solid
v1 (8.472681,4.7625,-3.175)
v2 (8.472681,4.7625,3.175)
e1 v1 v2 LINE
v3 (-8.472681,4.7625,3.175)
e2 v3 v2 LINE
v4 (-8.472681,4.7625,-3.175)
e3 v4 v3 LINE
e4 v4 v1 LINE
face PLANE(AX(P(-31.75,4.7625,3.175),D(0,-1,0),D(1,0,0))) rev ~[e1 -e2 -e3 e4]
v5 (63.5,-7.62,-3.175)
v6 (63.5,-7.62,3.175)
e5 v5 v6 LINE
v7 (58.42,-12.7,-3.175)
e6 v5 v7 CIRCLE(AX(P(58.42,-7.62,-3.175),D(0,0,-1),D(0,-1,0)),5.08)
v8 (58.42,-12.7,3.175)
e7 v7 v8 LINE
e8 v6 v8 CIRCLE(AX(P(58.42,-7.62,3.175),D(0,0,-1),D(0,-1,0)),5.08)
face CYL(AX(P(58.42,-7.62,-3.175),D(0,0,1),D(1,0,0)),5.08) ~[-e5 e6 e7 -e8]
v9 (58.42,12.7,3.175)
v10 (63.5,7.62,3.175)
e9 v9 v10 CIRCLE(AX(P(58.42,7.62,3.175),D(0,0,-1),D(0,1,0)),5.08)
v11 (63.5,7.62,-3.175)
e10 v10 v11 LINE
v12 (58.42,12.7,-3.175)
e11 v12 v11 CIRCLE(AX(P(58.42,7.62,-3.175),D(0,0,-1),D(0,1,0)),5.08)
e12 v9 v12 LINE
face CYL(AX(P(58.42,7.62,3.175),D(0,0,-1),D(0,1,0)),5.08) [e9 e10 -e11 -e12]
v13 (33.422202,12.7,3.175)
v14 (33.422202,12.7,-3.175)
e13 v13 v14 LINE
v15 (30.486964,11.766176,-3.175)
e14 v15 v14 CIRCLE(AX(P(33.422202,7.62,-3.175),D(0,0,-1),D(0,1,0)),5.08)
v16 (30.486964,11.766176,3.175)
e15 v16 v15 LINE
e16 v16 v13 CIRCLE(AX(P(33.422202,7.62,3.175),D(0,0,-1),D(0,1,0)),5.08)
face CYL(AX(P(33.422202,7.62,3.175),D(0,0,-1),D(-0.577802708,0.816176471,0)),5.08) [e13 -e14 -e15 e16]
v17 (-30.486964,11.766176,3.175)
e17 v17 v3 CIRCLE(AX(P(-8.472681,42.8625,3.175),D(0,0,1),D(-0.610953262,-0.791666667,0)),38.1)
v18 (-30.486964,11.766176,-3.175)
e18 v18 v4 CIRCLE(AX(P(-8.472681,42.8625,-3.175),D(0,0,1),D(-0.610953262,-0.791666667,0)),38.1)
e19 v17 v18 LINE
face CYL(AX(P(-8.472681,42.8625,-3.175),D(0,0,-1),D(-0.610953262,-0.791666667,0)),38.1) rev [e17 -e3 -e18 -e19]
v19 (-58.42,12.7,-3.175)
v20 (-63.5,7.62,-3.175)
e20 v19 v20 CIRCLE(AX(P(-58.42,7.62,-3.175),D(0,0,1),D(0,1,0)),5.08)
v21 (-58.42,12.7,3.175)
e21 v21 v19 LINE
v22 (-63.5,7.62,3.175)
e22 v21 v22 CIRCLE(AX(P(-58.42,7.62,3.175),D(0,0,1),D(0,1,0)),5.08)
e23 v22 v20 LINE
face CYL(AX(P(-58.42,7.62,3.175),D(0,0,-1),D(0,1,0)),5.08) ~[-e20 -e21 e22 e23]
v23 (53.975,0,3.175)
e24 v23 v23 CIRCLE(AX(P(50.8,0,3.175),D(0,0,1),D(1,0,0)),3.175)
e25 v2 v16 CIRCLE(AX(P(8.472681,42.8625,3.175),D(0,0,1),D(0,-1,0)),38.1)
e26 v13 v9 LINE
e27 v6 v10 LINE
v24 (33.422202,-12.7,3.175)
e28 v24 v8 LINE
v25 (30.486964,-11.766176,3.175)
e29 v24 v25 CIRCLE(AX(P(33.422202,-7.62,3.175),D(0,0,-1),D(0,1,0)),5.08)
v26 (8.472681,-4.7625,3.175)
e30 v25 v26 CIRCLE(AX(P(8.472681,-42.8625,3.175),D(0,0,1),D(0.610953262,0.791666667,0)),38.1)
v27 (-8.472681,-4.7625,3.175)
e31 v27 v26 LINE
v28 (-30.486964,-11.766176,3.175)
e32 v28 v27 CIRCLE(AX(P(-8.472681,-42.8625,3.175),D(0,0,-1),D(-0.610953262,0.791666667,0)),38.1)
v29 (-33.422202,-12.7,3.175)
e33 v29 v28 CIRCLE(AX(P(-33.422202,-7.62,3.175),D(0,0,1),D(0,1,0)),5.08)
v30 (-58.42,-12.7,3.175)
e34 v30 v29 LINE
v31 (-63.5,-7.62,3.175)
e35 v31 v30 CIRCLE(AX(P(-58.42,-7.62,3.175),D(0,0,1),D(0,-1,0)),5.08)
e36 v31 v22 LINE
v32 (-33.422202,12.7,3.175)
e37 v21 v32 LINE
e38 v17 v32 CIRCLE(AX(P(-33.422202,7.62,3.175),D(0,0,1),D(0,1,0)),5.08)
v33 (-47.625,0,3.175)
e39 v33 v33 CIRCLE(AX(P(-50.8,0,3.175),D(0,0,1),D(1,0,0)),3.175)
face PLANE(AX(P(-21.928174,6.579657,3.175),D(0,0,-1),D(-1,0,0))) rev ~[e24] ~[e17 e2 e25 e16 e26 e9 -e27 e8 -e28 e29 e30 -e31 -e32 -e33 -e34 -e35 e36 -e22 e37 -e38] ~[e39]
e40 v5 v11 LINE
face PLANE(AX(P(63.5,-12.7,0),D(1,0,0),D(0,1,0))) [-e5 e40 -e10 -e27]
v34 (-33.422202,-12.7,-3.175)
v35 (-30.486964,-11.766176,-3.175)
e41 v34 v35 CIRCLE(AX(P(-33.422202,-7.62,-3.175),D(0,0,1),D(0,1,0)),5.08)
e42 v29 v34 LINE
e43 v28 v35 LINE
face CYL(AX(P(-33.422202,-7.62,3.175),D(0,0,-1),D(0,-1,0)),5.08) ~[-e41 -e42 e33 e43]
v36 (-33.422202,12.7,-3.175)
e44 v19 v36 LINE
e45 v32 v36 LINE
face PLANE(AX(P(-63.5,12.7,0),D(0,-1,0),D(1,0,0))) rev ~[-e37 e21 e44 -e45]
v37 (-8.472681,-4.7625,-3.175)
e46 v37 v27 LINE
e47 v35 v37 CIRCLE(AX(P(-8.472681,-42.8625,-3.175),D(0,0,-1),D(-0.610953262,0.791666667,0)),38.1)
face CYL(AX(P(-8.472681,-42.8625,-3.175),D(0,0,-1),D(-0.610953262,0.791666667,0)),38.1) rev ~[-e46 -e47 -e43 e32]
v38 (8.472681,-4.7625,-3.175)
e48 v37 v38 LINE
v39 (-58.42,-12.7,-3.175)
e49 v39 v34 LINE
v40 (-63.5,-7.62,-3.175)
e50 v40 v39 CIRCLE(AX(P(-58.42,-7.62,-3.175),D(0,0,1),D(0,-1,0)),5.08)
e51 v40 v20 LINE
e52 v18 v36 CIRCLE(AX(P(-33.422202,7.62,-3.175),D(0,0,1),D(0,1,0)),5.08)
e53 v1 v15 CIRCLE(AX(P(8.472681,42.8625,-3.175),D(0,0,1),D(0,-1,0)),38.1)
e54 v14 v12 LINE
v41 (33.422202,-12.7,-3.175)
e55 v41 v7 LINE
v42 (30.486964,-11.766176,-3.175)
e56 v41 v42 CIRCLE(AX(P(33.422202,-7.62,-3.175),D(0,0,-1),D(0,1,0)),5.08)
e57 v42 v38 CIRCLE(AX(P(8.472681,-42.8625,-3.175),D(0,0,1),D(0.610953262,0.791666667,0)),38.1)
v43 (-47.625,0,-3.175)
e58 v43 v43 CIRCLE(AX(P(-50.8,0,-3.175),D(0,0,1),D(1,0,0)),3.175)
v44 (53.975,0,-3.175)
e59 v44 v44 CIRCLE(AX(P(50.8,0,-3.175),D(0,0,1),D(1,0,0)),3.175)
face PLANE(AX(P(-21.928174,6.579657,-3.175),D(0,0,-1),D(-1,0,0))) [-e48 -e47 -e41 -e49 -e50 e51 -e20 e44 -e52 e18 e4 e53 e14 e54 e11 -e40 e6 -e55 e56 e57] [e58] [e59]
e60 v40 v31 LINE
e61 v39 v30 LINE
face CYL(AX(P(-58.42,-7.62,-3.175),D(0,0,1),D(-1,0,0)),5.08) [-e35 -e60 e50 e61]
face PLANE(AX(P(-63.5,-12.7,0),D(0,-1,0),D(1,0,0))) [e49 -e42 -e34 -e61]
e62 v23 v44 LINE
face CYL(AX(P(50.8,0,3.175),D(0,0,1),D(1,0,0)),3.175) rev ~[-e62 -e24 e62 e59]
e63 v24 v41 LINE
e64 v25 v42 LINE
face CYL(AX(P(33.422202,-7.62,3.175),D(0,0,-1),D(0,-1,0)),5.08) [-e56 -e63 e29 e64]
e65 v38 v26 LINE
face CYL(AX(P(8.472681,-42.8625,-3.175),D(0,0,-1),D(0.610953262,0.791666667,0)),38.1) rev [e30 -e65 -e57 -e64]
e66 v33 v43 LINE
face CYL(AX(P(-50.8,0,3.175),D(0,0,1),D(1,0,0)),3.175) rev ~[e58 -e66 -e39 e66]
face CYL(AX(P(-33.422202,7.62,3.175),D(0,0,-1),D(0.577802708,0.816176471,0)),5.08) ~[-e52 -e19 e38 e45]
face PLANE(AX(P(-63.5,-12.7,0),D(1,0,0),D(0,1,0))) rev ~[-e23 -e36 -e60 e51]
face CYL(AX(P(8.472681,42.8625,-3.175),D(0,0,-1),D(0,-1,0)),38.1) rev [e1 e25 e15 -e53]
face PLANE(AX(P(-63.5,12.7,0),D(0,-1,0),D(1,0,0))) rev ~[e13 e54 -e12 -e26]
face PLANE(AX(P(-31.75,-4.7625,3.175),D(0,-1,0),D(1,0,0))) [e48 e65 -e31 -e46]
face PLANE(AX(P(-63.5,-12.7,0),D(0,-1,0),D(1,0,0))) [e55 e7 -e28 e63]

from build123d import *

# Parameters (mm, degrees)
F0_W        = 127
F0_H        = 25.4
F1_DEPTH    = 3.175
F2_W        = 63.5
F2_H        = 7.9375
F3_DEPTH    = 25.4
F4_T1_DEPTH = 6.35
F5_R        = 5.08
F6_R        = 3.175
F7_DEPTH    = 25.4


# Not quite as in the source:
# - a fillet or chamfer that OpenCascade refuses, or shapes differently, is made with other operations: its cross-section is extruded or revolved along the edge and cut away or added


with BuildPart() as f1:
    # F0 (on Top) → F1 (new body, symmetric)
    with BuildSketch(Plane.XY):
        Rectangle(F0_W, F0_H)
    extrude(amount=F1_DEPTH, both=True)

    # F2 (on face) → F3 (cut)
    with BuildSketch(Plane.XY.offset(3.175)):
        with Locations((0, 8.73125)):
            Rectangle(F2_W, F2_H)
        with Locations((0, -8.73125)):
            Rectangle(F2_W, F2_H)
    extrude(amount=-F3_DEPTH, mode=Mode.SUBTRACT)

    # F4: fillet of radius 38.1 on 4 edges, made by hand

    # F4_s2 → F4_t1 (join)
    with BuildSketch(Plane.XY.offset(-3.175)):
        with BuildLine():
            ThreePointArc((-31.75, 12.7), (-20.7694028252, 6.8014320042), (-8.4726807009, 4.7625))
            Line((-8.4726807009, 4.7625), (-31.75, 4.7625))
            Line((-31.75, 4.7625), (-31.75, 12.7))
        make_face()
        with BuildLine():
            ThreePointArc((8.4726807009, 4.7625), (20.7694028252, 6.8014320042), (31.75, 12.7))
            Line((31.75, 12.7), (31.75, 4.7625))
            Line((31.75, 4.7625), (8.4726807009, 4.7625))
        make_face()
        with BuildLine():
            ThreePointArc((31.75, -12.7), (20.7694028252, -6.8014320042), (8.4726807009, -4.7625))
            Line((8.4726807009, -4.7625), (31.75, -4.7625))
            Line((31.75, -4.7625), (31.75, -12.7))
        make_face()
        with BuildLine():
            ThreePointArc((-31.75, -12.7), (-20.7694028252, -6.8014320042), (-8.4726807009, -4.7625))
            Line((-8.4726807009, -4.7625), (-31.75, -4.7625))
            Line((-31.75, -4.7625), (-31.75, -12.7))
        make_face()
    extrude(amount=F4_T1_DEPTH)

    # F5
    f5_edges = [f1.edges().sort_by_distance(p)[0] for p in [
        (-63.5, 12.7, 0),
        (-31.75, 12.7, 0),
        (-63.5, -12.7, 0),
        (-31.75, -12.7, 0),
        (31.75, -12.7, 0),
        (63.5, -12.7, 0),
        (63.5, 12.7, 0),
        (31.75, 12.7, 0),
    ]]
    fillet(f5_edges, radius=F5_R)

    # F6 (on face) → F7 (cut)
    with BuildSketch(Plane.XY.offset(3.175)):
        with Locations((-50.8, 0)):
            Circle(F6_R)
        with Locations((50.8, 0)):
            Circle(F6_R)
    extrude(amount=-F7_DEPTH, mode=Mode.SUBTRACT)


solid = f1.part
